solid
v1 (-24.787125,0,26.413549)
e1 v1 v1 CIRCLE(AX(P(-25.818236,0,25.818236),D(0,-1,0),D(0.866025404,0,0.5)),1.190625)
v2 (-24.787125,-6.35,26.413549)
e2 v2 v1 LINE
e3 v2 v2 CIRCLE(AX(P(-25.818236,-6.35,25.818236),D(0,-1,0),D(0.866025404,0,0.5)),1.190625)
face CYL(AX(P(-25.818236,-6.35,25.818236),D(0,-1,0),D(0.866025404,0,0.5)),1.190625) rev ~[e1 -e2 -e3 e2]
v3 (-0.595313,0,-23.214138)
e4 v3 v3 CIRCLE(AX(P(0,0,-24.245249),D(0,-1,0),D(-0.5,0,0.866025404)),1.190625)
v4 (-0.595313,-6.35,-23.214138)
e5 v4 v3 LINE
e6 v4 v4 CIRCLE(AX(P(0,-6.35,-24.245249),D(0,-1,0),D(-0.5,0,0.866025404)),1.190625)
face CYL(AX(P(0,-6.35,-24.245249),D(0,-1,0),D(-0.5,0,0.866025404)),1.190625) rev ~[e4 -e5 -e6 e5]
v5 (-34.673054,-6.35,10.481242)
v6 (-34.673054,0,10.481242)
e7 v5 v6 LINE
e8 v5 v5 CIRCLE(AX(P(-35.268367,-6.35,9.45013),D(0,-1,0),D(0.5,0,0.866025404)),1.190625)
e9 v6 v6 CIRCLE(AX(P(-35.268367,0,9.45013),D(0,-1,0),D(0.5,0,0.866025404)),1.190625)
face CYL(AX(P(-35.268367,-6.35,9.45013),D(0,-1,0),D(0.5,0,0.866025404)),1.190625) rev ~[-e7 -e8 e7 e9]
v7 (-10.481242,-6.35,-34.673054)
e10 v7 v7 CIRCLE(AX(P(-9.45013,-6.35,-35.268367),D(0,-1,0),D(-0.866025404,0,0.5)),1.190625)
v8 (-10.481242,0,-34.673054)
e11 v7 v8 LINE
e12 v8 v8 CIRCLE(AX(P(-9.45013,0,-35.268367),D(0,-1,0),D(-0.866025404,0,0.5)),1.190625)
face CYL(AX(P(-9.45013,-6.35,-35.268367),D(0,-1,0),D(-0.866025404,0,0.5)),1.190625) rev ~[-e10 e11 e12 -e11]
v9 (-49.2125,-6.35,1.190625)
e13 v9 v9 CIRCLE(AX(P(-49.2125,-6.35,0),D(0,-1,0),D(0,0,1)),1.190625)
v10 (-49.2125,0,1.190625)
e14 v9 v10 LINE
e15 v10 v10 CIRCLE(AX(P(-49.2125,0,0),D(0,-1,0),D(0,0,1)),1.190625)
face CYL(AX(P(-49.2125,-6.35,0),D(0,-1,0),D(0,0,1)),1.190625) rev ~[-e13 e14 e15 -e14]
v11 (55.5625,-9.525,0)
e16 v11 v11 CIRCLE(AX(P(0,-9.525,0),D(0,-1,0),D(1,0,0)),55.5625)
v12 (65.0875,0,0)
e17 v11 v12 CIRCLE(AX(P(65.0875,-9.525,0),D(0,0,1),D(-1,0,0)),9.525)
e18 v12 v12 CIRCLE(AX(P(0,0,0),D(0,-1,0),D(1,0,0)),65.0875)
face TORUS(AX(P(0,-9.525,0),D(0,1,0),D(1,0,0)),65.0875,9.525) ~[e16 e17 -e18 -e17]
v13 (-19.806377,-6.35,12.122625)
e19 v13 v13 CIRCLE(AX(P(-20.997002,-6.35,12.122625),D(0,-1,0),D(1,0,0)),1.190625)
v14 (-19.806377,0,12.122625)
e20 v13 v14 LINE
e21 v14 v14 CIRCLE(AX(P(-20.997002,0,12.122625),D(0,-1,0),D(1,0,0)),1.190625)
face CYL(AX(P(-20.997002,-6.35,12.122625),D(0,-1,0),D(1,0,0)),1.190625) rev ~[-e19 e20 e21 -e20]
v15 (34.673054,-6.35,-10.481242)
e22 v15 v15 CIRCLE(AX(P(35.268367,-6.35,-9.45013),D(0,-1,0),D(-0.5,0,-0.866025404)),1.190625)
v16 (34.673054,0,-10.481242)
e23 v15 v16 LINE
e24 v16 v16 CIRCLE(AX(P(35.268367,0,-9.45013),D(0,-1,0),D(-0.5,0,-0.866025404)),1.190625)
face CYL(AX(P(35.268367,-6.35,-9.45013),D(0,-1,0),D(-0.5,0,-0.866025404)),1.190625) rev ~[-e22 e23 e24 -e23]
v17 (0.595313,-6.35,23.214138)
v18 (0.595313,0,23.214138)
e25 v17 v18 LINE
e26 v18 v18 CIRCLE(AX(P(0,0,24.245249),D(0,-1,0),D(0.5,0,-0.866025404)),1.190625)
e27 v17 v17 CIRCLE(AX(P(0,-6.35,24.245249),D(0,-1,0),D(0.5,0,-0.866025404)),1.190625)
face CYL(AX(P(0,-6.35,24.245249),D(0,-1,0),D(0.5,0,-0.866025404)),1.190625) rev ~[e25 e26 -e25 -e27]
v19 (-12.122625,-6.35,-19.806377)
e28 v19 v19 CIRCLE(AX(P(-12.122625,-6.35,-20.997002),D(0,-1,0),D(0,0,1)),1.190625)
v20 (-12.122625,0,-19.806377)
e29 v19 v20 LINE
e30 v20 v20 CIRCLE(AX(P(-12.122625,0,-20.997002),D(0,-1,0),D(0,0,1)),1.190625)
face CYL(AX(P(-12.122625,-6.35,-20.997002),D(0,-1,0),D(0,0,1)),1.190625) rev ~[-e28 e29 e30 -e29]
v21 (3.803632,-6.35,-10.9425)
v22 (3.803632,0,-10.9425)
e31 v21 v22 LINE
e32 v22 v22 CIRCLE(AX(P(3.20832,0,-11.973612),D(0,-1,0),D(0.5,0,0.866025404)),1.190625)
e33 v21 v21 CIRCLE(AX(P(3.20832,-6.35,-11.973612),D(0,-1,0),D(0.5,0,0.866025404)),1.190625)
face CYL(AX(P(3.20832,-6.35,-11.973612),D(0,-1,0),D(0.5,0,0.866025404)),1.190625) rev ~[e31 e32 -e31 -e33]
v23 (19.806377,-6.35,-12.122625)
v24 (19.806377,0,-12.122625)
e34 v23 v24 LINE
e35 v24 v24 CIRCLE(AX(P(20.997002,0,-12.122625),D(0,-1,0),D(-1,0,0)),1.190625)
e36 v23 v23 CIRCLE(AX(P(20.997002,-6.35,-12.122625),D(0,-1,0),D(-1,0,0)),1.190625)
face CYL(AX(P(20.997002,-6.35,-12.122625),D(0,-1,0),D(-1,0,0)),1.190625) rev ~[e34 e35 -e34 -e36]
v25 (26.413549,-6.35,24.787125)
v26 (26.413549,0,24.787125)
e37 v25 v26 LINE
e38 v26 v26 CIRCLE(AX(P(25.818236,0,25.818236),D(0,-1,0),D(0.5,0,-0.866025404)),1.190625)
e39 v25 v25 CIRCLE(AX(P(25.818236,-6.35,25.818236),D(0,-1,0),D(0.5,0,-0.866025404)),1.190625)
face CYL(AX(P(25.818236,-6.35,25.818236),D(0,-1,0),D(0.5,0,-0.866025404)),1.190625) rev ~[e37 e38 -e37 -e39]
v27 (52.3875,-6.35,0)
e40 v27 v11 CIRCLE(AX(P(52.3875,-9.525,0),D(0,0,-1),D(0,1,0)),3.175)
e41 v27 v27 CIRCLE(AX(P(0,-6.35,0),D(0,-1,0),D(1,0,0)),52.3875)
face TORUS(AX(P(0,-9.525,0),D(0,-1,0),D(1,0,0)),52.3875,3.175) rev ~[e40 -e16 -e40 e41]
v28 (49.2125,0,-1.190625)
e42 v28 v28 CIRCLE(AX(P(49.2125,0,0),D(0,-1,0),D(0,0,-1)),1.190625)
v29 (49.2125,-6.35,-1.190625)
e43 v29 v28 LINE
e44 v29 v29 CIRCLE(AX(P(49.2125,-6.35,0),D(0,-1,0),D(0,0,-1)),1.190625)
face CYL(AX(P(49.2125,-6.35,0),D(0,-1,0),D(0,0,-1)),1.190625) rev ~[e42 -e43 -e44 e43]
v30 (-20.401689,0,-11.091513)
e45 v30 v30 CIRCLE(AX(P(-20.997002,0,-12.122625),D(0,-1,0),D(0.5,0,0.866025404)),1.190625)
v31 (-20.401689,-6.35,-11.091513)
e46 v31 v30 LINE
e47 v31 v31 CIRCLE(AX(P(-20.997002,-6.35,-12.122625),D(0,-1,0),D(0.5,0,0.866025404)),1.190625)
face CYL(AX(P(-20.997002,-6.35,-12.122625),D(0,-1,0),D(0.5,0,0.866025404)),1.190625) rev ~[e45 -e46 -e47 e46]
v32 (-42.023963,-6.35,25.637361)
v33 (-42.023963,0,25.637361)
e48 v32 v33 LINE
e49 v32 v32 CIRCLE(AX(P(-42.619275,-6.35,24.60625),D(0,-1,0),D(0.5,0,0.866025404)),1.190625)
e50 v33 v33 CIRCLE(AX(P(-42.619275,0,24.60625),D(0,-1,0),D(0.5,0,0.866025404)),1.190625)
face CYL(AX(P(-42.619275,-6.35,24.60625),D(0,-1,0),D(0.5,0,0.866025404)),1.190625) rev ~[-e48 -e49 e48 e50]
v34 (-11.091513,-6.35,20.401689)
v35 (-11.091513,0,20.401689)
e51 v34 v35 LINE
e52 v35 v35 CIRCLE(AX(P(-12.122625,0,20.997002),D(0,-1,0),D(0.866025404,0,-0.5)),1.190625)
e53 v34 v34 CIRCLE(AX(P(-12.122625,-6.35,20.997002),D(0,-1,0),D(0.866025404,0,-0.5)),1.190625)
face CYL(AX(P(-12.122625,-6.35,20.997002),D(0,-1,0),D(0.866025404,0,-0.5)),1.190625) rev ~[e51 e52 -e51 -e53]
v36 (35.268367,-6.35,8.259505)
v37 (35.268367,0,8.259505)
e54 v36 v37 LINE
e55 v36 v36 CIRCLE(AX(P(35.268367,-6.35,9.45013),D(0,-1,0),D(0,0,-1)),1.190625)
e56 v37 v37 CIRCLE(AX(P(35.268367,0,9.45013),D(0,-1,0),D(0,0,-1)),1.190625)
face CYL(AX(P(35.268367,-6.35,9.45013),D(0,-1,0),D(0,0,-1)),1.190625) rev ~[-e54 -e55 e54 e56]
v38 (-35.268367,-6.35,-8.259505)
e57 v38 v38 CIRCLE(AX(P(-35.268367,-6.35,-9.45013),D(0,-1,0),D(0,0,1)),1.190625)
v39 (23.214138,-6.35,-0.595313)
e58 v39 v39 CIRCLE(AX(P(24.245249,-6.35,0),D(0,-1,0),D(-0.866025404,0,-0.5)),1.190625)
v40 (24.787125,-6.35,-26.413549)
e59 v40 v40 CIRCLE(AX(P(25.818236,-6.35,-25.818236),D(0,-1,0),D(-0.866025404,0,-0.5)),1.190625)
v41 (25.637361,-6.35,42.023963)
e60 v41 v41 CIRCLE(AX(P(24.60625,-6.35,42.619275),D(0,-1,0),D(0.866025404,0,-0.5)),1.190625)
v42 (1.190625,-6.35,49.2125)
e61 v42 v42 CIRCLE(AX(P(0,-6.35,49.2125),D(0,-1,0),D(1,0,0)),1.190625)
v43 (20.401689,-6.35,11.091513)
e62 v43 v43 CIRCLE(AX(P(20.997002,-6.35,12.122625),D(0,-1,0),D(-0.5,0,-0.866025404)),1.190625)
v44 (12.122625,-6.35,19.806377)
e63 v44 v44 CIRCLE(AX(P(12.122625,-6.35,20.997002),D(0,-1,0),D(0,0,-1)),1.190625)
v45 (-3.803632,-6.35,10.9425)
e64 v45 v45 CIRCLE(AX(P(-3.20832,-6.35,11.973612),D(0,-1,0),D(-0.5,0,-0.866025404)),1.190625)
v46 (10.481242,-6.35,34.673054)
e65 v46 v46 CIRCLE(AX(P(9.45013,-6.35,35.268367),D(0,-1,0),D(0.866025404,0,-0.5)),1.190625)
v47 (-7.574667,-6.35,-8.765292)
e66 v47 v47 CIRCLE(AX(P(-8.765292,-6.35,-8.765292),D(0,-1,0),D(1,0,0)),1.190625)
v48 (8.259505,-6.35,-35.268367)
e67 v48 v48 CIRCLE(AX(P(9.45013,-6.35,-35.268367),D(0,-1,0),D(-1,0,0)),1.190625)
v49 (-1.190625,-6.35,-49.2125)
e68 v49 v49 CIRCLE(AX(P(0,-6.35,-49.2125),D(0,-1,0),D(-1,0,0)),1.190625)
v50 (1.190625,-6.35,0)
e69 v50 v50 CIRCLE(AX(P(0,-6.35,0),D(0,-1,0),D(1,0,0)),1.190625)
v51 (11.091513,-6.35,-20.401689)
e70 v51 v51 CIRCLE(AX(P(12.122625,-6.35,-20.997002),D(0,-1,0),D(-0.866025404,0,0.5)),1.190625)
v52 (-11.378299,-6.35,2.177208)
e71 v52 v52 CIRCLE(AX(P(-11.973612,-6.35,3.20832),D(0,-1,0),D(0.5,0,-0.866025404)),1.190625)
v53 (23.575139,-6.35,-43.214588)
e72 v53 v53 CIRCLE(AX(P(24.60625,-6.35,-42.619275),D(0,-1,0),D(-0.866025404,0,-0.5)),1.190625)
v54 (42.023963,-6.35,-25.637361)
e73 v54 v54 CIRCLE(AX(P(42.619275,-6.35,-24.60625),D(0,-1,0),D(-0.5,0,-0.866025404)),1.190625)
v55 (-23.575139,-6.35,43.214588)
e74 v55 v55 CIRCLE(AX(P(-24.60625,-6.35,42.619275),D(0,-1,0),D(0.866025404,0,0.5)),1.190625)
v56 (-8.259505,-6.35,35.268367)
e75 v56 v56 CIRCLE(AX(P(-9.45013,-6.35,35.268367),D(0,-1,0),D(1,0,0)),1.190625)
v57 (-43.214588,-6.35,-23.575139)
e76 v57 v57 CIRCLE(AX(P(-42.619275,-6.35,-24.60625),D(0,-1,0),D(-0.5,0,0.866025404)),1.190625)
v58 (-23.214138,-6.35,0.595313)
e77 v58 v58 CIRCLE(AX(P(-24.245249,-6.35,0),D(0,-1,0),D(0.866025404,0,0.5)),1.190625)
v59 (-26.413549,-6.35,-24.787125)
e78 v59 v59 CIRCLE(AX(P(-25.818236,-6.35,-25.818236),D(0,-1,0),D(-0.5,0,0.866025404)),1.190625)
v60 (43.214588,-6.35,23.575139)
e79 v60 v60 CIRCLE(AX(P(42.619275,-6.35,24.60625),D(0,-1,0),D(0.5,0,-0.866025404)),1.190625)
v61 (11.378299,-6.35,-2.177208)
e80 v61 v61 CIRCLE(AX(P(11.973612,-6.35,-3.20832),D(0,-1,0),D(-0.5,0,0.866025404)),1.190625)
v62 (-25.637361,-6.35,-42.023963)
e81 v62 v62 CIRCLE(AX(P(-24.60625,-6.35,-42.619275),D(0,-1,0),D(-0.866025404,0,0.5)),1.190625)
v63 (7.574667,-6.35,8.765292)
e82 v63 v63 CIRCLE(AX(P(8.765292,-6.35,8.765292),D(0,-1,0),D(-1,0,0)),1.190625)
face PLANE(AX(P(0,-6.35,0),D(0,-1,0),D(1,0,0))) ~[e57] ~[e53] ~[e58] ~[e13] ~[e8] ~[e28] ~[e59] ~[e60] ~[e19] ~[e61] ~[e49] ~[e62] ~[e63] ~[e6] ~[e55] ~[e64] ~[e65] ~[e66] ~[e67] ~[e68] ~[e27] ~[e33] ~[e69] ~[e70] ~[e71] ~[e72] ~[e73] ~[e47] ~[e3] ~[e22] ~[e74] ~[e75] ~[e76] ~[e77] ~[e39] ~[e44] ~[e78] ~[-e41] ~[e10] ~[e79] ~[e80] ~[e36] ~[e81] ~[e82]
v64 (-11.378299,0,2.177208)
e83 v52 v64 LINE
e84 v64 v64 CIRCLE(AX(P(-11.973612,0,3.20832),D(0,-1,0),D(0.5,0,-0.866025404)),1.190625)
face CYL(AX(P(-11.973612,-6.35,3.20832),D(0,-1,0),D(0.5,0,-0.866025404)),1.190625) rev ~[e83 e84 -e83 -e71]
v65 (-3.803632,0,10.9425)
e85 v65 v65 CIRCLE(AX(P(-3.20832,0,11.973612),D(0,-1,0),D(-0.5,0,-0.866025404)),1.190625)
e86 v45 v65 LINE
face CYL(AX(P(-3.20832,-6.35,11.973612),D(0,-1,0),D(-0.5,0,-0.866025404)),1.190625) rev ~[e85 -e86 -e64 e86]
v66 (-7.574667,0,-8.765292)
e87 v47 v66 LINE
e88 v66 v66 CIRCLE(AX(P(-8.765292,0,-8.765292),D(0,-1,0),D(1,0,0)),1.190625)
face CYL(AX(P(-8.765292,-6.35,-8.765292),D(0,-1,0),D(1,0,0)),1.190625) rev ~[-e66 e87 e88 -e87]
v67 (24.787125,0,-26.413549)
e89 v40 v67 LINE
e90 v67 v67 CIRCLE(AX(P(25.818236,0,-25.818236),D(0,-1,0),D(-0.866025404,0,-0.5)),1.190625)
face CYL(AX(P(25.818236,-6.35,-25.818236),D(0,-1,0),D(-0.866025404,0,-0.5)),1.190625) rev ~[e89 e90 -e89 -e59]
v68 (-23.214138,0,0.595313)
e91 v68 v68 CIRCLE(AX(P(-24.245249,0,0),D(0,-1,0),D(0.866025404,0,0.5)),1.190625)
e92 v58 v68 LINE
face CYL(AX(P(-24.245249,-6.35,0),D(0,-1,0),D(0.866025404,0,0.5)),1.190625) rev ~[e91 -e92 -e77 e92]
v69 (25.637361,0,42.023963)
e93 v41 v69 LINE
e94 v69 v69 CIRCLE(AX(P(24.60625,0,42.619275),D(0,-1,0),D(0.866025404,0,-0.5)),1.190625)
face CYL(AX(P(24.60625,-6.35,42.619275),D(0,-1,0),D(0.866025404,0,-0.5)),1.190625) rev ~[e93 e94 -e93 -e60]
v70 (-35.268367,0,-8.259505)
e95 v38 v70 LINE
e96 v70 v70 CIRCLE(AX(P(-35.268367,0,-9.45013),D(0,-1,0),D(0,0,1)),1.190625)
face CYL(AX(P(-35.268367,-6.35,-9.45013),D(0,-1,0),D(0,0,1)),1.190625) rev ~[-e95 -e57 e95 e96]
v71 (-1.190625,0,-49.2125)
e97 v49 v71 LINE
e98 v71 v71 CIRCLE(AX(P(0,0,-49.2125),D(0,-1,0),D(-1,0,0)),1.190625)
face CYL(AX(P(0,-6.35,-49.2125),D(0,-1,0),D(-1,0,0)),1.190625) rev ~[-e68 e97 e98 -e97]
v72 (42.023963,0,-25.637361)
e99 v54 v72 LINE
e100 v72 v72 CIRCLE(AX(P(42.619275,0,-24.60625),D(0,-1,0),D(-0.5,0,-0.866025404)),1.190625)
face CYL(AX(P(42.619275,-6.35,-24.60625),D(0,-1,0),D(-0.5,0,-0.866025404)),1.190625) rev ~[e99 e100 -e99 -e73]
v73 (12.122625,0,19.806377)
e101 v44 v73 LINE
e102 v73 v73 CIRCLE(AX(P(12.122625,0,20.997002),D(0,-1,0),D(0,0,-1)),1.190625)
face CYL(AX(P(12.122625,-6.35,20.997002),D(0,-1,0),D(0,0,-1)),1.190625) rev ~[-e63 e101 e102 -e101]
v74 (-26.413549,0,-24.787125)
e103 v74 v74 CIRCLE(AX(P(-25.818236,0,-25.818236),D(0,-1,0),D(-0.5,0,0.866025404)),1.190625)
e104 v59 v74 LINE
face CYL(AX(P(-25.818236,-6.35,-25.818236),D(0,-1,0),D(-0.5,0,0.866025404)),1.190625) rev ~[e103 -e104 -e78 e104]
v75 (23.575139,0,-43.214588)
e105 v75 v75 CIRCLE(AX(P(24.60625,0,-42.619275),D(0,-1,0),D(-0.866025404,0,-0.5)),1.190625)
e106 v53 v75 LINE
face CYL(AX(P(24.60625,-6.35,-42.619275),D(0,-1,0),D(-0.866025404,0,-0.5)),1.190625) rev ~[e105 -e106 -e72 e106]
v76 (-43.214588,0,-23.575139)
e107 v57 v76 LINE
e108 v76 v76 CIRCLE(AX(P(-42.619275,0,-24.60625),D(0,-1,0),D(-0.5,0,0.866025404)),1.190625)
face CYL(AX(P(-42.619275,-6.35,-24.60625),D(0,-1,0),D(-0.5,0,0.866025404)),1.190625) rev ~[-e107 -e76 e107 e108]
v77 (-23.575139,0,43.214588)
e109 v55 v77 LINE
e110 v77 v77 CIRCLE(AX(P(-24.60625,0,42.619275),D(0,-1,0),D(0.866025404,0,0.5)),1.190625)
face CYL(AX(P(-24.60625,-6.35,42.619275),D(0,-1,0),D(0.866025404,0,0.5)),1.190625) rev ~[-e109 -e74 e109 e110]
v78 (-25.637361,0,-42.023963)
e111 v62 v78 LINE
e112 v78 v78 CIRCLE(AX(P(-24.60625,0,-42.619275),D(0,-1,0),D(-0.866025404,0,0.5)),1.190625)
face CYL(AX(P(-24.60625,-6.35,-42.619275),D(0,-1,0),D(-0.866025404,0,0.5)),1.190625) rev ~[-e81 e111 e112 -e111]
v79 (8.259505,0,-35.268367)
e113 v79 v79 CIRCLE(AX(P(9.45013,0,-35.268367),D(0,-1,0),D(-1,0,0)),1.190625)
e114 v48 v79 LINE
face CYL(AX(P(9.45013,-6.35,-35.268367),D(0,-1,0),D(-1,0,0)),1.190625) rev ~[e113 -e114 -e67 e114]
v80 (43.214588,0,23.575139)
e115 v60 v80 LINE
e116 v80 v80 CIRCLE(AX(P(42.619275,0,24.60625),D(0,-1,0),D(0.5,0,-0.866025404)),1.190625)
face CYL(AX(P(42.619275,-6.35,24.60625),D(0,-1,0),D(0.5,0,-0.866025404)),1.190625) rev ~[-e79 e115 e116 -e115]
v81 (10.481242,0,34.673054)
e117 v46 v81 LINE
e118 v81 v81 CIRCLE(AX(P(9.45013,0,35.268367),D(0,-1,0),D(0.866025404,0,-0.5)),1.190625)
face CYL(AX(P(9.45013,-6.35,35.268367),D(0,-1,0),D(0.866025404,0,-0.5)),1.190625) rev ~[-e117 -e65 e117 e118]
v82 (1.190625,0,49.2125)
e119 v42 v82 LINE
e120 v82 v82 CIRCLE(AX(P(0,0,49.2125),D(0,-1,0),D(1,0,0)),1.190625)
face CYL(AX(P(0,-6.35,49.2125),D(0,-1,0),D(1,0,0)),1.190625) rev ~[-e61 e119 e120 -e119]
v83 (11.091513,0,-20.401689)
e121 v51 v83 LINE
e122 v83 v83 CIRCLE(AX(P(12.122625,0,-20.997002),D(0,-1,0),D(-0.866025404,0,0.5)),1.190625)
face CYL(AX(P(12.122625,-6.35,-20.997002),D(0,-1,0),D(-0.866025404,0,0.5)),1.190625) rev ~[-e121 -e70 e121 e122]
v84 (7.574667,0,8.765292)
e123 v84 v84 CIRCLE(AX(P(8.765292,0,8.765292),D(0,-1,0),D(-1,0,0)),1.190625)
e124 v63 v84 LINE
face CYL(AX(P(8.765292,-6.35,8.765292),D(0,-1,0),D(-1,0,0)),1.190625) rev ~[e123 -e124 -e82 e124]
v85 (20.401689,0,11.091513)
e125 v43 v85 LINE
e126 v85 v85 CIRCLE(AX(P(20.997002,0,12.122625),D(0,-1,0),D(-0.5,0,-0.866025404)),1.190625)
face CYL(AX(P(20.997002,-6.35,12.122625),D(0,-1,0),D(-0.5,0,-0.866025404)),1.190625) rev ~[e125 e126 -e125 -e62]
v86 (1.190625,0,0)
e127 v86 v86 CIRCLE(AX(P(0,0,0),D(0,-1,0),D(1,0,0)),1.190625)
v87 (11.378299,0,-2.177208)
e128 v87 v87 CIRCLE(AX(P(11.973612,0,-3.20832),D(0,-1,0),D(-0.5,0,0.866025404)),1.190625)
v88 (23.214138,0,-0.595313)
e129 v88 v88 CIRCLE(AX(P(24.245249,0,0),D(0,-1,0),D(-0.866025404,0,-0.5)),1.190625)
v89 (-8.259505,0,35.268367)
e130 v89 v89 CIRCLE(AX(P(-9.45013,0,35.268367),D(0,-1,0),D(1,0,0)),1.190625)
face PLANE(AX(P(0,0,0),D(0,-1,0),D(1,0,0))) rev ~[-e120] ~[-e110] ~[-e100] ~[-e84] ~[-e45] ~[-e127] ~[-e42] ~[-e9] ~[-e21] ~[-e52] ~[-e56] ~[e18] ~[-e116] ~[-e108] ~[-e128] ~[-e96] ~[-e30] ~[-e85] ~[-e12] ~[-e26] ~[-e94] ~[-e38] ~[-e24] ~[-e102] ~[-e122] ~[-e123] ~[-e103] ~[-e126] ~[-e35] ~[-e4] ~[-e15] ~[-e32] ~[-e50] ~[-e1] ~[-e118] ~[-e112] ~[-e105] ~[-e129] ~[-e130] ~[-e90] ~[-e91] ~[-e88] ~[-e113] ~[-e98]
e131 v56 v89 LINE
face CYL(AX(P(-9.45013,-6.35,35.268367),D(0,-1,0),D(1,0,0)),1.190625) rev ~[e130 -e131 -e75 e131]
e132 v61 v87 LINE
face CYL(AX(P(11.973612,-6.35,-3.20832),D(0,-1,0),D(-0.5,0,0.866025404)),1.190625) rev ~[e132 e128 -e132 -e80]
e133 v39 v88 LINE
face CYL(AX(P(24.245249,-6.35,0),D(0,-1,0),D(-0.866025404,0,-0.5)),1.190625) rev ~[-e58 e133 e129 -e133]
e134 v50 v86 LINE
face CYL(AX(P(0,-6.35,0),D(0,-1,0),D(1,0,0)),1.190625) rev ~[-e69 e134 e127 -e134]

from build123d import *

# Parameters (mm, degrees)
F3_R             = 1.190625
F4_DEPTH         = 6.35
F4_COPIES_COUNT  = 12
F5_R             = 1.190625
F6_DEPTH         = 6.35
F6_COPIES_COUNT  = 12
F7_R             = 1.190625
F8_DEPTH         = 6.35
F8_COPIES_COUNT  = 12
F9_R             = 1.190625
F10_DEPTH        = 6.35
F10_COPIES_COUNT = 6


# Not quite as in the source:
# - a pattern or mirror of a feature is missing from the dataset's text; its kind, count and spacing are read off the source's solid


with BuildPart() as f2:
    # F0 (on Top) → F2 (revolve)
    with BuildSketch(Plane.XY):
        with BuildLine():
            Line((65.0875, 0), (0, 0))
            Line((0, 0), (0, -6.35))
            Line((0, -6.35), (52.3875, -6.35))
            ThreePointArc((52.3875, -6.35), (54.6325640303, -7.2799359697), (55.5625, -9.525))
            ThreePointArc((55.5625, -9.525), (71.8226920908, -16.2601920908), (65.0875, 0))
        make_face()
    revolve(axis=Axis((0, 0, 0), (0, -1, 0)))

    # F3 (on face) → F4 (cut, through all)
    with BuildSketch(Plane.XZ.offset(6.35)):
        with Locations((0, 49.2125)):
            Circle(F3_R)
    f4 = extrude(amount=-F4_DEPTH, mode=Mode.SUBTRACT)

    # F4_copies: F4 ×12 about axis
    f4_copies_axis = Axis((0, 0, 0), (0, 1, 0))
    for i in range(1, F4_COPIES_COUNT):
        add(f4.rotate(f4_copies_axis, i * 360 / F4_COPIES_COUNT), mode=Mode.SUBTRACT)

    # F5 (on face) → F6 (cut, through all)
    with BuildSketch(Plane.XZ.offset(6.35)):
        with Locations((-9.4501303843, 35.2683667324)):
            Circle(F5_R)
    f6 = extrude(amount=-F6_DEPTH, mode=Mode.SUBTRACT)

    # F6_copies: F6 ×12 about axis
    f6_copies_axis = Axis((0, 0, 0), (0, 1, 0))
    for i in range(1, F6_COPIES_COUNT):
        add(f6.rotate(f6_copies_axis, i * 360 / F6_COPIES_COUNT), mode=Mode.SUBTRACT)

    # F7 (on face) → F8 (cut, through all)
    with BuildSketch(Plane.XZ.offset(6.35)):
        with Locations((-20.9970018429, 12.1226246662)):
            Circle(F7_R)
    f8 = extrude(amount=-F8_DEPTH, mode=Mode.SUBTRACT)

    # F8_copies: F8 ×12 about axis
    f8_copies_axis = Axis((0, 0, 0), (0, 1, 0))
    for i in range(1, F8_COPIES_COUNT):
        add(f8.rotate(f8_copies_axis, i * 360 / F8_COPIES_COUNT), mode=Mode.SUBTRACT)

    # F9 (on face) → F10 (cut, through all)
    with BuildSketch(Plane.XZ.offset(6.35)):
        with Locations((-8.7652921912, -8.7652921912)):
            Circle(F9_R)
        Circle(F9_R)
    f10 = extrude(amount=-F10_DEPTH, mode=Mode.SUBTRACT)

    # F10_copies: F10 ×6 about axis
    f10_copies_axis = Axis((0, 0, 0), (0, 1, 0))
    for i in range(1, F10_COPIES_COUNT):
        add(f10.rotate(f10_copies_axis, i * 360 / F10_COPIES_COUNT), mode=Mode.SUBTRACT)


solid = f2.part
